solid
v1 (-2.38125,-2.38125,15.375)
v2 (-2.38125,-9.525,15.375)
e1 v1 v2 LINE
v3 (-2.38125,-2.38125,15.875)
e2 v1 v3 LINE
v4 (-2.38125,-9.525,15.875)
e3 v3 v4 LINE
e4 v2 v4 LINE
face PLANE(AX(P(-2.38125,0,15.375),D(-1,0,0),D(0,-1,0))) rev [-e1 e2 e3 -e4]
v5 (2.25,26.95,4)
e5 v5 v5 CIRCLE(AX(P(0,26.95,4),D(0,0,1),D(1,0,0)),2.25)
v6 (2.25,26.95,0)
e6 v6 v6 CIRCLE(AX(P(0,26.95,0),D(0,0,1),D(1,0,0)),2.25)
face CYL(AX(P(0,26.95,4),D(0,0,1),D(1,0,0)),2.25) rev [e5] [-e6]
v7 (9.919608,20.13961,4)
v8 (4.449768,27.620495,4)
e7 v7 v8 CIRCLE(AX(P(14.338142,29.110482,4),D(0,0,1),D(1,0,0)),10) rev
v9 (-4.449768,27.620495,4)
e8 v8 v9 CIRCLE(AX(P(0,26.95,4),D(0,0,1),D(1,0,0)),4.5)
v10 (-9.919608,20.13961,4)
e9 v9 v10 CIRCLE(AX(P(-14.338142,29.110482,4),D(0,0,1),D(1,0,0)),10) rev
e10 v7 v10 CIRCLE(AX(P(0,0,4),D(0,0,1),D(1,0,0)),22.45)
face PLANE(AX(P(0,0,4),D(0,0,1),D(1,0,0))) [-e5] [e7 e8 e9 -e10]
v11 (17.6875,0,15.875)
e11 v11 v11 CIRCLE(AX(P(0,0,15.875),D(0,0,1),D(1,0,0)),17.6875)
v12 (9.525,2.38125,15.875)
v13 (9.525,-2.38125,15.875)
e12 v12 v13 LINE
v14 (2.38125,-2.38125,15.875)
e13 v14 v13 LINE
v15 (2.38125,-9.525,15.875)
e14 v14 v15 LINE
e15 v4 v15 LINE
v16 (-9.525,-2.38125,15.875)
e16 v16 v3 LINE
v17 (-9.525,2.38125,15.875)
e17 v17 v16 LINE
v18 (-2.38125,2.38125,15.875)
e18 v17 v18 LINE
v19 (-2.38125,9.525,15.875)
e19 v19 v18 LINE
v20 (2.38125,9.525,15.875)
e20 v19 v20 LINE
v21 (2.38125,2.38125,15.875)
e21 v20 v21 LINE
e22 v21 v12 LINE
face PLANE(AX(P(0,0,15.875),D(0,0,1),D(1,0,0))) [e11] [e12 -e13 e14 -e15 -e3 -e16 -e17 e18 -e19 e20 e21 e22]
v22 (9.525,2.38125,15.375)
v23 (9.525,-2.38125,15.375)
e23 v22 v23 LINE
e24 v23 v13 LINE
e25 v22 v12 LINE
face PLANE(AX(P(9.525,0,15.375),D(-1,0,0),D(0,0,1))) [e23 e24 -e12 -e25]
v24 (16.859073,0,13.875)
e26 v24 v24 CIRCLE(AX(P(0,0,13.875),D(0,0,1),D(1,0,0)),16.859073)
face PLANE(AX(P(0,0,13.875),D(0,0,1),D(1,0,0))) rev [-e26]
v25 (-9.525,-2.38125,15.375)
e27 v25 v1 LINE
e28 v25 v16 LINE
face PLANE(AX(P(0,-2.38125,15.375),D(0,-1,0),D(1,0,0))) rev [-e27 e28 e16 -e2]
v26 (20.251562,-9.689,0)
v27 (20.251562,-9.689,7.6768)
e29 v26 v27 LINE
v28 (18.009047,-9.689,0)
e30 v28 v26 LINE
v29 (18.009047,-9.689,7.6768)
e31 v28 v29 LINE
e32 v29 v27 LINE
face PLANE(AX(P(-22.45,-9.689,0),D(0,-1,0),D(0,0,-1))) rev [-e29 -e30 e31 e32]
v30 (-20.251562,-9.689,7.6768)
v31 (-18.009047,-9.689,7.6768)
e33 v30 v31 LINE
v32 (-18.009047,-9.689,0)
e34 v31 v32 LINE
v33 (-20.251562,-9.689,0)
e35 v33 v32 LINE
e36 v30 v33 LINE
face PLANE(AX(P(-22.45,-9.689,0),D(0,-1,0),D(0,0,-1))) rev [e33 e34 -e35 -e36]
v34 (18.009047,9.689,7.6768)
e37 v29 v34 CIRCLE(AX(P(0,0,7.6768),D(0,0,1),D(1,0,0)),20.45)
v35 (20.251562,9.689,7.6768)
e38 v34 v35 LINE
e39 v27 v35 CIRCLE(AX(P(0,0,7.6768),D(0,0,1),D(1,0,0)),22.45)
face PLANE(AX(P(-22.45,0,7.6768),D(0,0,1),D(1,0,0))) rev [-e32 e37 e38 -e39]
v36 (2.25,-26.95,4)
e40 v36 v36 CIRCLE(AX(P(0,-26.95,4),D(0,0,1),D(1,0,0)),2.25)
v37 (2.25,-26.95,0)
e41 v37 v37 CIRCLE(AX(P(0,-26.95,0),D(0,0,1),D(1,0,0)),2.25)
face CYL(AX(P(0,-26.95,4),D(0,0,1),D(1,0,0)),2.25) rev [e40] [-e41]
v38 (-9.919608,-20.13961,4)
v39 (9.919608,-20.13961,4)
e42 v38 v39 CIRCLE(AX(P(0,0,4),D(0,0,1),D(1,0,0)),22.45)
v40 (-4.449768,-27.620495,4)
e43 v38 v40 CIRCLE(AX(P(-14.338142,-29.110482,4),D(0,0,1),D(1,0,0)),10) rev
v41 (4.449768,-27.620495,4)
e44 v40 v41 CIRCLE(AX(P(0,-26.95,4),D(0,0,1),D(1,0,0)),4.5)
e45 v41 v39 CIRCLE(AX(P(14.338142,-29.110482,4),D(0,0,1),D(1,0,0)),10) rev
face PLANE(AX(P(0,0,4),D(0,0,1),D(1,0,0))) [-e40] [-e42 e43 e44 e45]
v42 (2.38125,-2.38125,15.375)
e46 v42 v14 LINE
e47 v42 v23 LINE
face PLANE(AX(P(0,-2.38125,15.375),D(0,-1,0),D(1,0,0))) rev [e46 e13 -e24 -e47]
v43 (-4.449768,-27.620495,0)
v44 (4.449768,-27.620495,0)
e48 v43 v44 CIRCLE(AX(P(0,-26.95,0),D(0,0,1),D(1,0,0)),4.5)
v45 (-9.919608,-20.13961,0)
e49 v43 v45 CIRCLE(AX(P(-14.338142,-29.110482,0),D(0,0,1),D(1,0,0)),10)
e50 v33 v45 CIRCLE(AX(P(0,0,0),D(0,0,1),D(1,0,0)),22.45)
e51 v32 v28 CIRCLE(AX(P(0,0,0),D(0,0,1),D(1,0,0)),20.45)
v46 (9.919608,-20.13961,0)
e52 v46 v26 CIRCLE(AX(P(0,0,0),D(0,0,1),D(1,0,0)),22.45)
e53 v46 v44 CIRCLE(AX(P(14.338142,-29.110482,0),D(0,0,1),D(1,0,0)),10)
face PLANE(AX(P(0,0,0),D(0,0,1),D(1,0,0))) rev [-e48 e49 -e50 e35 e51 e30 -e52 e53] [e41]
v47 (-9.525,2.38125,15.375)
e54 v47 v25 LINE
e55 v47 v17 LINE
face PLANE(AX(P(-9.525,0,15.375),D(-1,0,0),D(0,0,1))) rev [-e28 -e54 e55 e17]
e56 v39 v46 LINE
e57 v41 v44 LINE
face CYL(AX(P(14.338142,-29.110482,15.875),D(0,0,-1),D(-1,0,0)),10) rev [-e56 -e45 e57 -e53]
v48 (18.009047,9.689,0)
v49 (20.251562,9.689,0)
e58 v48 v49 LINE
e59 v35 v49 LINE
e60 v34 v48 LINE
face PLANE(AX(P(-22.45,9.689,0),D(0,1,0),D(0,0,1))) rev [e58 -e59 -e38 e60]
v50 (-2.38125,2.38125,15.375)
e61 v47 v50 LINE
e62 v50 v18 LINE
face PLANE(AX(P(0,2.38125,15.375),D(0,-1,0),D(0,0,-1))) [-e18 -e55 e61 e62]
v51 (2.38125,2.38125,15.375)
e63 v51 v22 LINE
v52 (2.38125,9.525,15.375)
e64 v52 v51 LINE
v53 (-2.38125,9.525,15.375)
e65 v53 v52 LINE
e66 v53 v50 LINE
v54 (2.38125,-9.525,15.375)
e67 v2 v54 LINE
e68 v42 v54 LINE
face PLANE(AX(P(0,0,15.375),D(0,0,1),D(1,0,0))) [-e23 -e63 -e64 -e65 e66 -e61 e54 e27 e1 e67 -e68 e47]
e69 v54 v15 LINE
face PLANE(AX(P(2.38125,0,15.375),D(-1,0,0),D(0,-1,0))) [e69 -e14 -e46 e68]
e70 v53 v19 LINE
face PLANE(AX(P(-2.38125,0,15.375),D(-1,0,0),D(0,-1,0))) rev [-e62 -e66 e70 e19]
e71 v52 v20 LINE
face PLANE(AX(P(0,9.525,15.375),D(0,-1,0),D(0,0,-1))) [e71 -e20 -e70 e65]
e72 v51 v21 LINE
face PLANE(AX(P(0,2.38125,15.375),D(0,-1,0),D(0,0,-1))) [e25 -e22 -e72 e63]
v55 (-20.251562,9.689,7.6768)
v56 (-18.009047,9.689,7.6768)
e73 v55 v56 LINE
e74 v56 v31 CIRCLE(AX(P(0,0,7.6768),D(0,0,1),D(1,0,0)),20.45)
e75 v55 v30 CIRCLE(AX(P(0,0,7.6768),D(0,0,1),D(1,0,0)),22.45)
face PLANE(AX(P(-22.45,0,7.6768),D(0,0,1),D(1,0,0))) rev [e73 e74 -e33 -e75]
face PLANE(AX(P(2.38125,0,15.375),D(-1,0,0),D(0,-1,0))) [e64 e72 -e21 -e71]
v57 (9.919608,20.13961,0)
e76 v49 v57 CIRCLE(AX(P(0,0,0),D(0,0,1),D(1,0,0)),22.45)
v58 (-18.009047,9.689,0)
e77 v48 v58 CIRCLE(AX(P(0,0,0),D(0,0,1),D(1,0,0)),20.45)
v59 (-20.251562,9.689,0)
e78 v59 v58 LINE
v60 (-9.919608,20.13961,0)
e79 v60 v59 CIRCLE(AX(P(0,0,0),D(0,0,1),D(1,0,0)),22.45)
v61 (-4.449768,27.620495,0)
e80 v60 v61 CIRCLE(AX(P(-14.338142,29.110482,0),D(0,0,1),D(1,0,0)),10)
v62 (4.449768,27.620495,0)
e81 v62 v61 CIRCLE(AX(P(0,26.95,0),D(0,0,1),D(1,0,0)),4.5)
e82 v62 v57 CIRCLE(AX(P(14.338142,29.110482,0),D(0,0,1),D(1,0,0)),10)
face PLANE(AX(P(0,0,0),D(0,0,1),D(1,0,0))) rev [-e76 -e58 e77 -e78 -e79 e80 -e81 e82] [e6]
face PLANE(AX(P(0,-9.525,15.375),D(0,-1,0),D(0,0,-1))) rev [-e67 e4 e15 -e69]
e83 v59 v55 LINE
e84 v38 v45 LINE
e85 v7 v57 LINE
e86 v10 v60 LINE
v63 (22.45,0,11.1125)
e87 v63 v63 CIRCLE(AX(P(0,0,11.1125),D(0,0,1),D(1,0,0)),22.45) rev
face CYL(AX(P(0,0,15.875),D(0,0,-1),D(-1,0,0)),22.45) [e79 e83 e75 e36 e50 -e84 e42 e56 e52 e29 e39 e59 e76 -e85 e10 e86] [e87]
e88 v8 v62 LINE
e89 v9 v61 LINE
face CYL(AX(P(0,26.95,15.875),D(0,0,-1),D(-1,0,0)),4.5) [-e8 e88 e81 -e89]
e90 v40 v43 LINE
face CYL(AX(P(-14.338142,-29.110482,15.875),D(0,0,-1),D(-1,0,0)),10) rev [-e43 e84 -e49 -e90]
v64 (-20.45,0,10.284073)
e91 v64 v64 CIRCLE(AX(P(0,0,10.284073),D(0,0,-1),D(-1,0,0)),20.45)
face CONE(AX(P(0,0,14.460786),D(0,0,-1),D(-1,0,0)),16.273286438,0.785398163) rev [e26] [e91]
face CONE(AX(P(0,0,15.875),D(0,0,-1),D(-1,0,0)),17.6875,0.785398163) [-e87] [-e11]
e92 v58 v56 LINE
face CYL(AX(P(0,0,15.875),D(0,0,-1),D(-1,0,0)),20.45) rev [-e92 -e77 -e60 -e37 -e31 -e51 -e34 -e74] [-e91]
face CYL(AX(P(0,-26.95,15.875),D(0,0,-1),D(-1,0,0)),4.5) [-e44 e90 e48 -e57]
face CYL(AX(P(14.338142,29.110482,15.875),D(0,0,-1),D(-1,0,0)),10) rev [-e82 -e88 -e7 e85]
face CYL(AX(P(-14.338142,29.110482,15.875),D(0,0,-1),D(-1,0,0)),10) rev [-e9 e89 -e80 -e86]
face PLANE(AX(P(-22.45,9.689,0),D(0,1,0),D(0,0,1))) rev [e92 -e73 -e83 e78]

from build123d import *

# Parameters (mm, degrees)
SKETCH1_R               = 20.450000000000003
BOSS_EXTRUDE1_DEPTH     = 15.875
CUT_EXTRUDE2_START      = -11.875
CUT_EXTRUDE2_DEPTH      = 11.875
M4_CLEARANCE_HOLE1_D    = 4.5
CHAMFER1_SIZE           = 4.7625
SHELL1_OUTLINE_R        = 20.45
SHELL1_DEPTH            = 10.284072775
SHELL1_2_DEPTH          = 2
BOSS_EXTRUDE2_START     = 2
BOSS_EXTRUDE2_DEPTH     = 2
CUT_EXTRUDE5_DEPTH      = 0.5
CUT_EXTRUDE7_DEPTH      = 42.774640932046694
CUT_EXTRUDE7_DEPTH_BACK = 42.774640932046694


with BuildPart() as part:
    # Sketch1 → Boss-Extrude1 (new body)
    # profile 1 of 2: a face of its own
    with BuildSketch(Plane.XY):
        with BuildLine():
            ThreePointArc((-4.449768205772106, -27.620494530122933), (-6.26579346059064, -23.208178662106004), (-9.919608253272203, -20.139609532026952))
            ThreePointArc((-9.919608253272203, -20.139609532026952), (-22.449999999999612, -2.260939e-11), (-9.919608253272486, 20.139609531981904))
            ThreePointArc((-9.919608253272486, 20.139609531981904), (-6.265793460590954, 23.208178662061), (-4.449768205772483, 27.620494530077963))
            ThreePointArc((-4.449768205772483, 27.620494530077963), (1.6339e-13, 31.449999999977553), (4.449768205772869, 27.620494530078034))
            ThreePointArc((4.449768205772869, 27.620494530078034), (6.265793460591407, 23.2081786620611), (9.919608253272981, 20.139609531982046))
            ThreePointArc((9.919608253272981, 20.139609531982046), (22.4500000000004, -2.229809e-11), (9.919608253273257, -20.13960953202682))
            ThreePointArc((9.919608253273257, -20.13960953202682), (6.265793460591725, -23.20817866210592), (4.449768205773249, -27.620494530122876))
            ThreePointArc((4.449768205773249, -27.620494530122876), (5.9636e-13, -31.450000000022463), (-4.449768205772106, -27.620494530122933))
        make_face()
        Circle(SKETCH1_R, mode=Mode.SUBTRACT)
    # profile 2 of 2: a face of its own
    with BuildSketch(Plane.XY):
        Circle(SKETCH1_R)
    extrude(amount=BOSS_EXTRUDE1_DEPTH)

    # Sketch3 → Cut-Extrude2 (cut)
    with BuildSketch(Plane.XY.offset(15.875).offset(CUT_EXTRUDE2_START)):
        with BuildLine():
            ThreePointArc((-9.919608253272486, 20.139609531981908), (2.3162e-13, 22.449999999977553), (9.919608253272981, 20.13960953198205))
            ThreePointArc((9.91960825327298, 20.139609531982046), (6.2657934605914, 23.208178662061094), (4.4497682057728625, 27.620494530078037))
            ThreePointArc((4.4497682057728625, 27.620494530078037), (1.6065e-13, 31.449999999977546), (-4.449768205772477, 27.620494530077963))
            ThreePointArc((-4.449768205772479, 27.620494530077963), (-6.265793460590951, 23.208178662061), (-9.919608253272482, 20.139609531981904))
        make_face()
        with BuildLine():
            ThreePointArc((4.449768205773246, -27.62049453012288), (6.265793460591725, -23.20817866210592), (9.919608253273257, -20.13960953202682))
            ThreePointArc((9.919608253273244, -20.139609532026824), (5.4515e-13, -22.45000000002246), (-9.919608253272205, -20.139609532026956))
            ThreePointArc((-9.9196082532722, -20.139609532026952), (-6.265793460590633, -23.208178662106), (-4.449768205772095, -27.620494530122933))
            ThreePointArc((-4.4497682057720995, -27.620494530122933), (5.9608e-13, -31.450000000022456), (4.449768205773246, -27.62049453012288))
        make_face()
    extrude(amount=CUT_EXTRUDE2_DEPTH, mode=Mode.SUBTRACT)

    # M4 Clearance Hole1 (through all)
    with Locations(Plane.XY.offset(4)):
        with Locations((0, -26.95), (0, 26.95)):
            Hole(M4_CLEARANCE_HOLE1_D / 2)

    # Chamfer1
    chamfer1_edges = [part.edges().sort_by_distance(p)[0] for p in [
        (9.91960825327299, 20.139609531982046, 15.875),
    ]]
    chamfer(chamfer1_edges, length=CHAMFER1_SIZE)

    # Shell1: read off the stored shape, not the designer's step
    # Shell1 outline → Shell1 (cut)
    with BuildSketch(Plane.XY):
        Circle(SHELL1_OUTLINE_R)
    extrude(amount=SHELL1_DEPTH, mode=Mode.SUBTRACT)

    # Shell1 2 outline → Shell1 2 (cut)
    with BuildSketch(Plane.XY):
        with BuildLine():
            ThreePointArc((9.035901505, -18.345434963), (0, -20.45), (-9.035901505, -18.345434963))
            ThreePointArc((-9.035901505, -18.345434963), (-5.656595992, -20.826114024), (-3.336769132, -24.317800965))
            ThreePointArc((-3.336769132, -24.317800965), (0, -22.7), (3.336769132, -24.317800965))
            ThreePointArc((3.336769132, -24.317800965), (5.656595992, -20.826114024), (9.035901505, -18.345434963))
        make_face()
        with BuildLine():
            ThreePointArc((-3.336769132, 24.317800965), (-5.656595992, 20.826114024), (-9.035901505, 18.345434963))
            ThreePointArc((-9.035901505, 18.345434963), (0, 20.45), (9.035901505, 18.345434963))
            ThreePointArc((9.035901505, 18.345434963), (5.656595992, 20.826114024), (3.336769132, 24.317800965))
            ThreePointArc((3.336769132, 24.317800965), (0, 22.7), (-3.336769132, 24.317800965))
        make_face()
    extrude(amount=SHELL1_2_DEPTH, mode=Mode.SUBTRACT)

    # Shell1 3 outline → Shell1 3 (revolve, cut)
    with BuildSketch(Plane.XZ):
        Polygon((16.859072875, 13.875), (0, 13.875), (0, 10.284072775), (20.45, 10.284072775), align=None)
    revolve(axis=Axis((0, 0, 0), (0, 0, 1)), mode=Mode.SUBTRACT)

    # Sketch6 → Boss-Extrude2 (add)
    with BuildSketch(Plane(origin=(0, 0, 2), x_dir=(-1, 0, 0), z_dir=(0, 0, -1)).offset(BOSS_EXTRUDE2_START)):
        with BuildLine():
            ThreePointArc((9.035901504651038, -18.34543496347422), (5.656595991725949, -20.826114024149227), (3.3367691319005477, -24.3178009648972))
            ThreePointArc((3.3367691319005477, -24.3178009648972), (-5.6684e-13, -22.70000000000008), (-3.3367691319011485, -24.317800964898304))
            ThreePointArc((-3.3367691319011485, -24.317800964898304), (-5.656595991726578, -20.826114024149597), (-9.035901504652076, -18.345434963474087))
            ThreePointArc((-9.035901504652076, -18.345434963474087), (-5.3382e-13, -20.45000000002246), (9.035901504651038, -18.34543496347422))
        make_face()
        with BuildLine():
            ThreePointArc((-9.035901504651829, 18.345434963429298), (-5.65659599172108, 20.826114024110222), (-3.336769131894781, 24.31780096486728))
            ThreePointArc((-3.336769131894781, 24.31780096486728), (-2.2525e-13, 22.699999999977557), (3.336769131894348, 24.317800964867242))
            ThreePointArc((3.336769131894348, 24.317800964867242), (5.656595991720593, 20.826114024110154), (9.03590150465129, 18.345434963429177))
            ThreePointArc((9.03590150465129, 18.345434963429177), (-2.5229e-13, 20.449999999977546), (-9.035901504651829, 18.345434963429298))
        make_face()
    extrude(amount=-BOSS_EXTRUDE2_DEPTH)

    # Sketch7 → Cut-Extrude5 (cut)
    with BuildSketch(Plane.XY.offset(15.875)):
        Polygon((-2.381250000000002, 9.524999999999997), (-2.381250000000001, 2.3812500000000005), (2.3812499999999996, 2.3812500000000005), (2.3812499999999983, 9.524999999999997), align=None)
        Polygon((2.3812499999999996, 2.3812500000000005), (-2.3812500000000014, 2.3812500000000005), (-2.3812500000000005, -2.3812499999999996), (2.3812499999999996, -2.3812499999999996), align=None)
        Polygon((9.525, 2.3812500000000005), (2.3812499999999996, 2.3812500000000005), (2.381249999999999, -2.3812499999999996), (9.525, -2.3812499999999996), align=None)
        Polygon((-2.3812500000000014, 2.3812500000000005), (-9.525, 2.3812500000000005), (-9.525, -2.3812500000000005), (-2.3812500000000005, -2.38125), align=None)
        Polygon((2.3812499999999996, -2.3812499999999996), (-2.3812500000000005, -2.38125), (-2.3812499999999996, -9.525000000000004), (2.3812499999999996, -9.525000000000004), align=None)
    extrude(amount=-CUT_EXTRUDE5_DEPTH, mode=Mode.SUBTRACT)

    # Sketch9 → Cut-Extrude7 (cut, two sides: drawn at the far end of the back side and taken through both)
    # profile 1 of 3: a face of its own
    with BuildSketch(Plane(origin=(0, 0, 0), x_dir=(0, 0, -1), z_dir=(1, 0, 0)).offset(-CUT_EXTRUDE7_DEPTH_BACK)):
        Polygon((-1.5018000000013485, 9.688999997177131), (-1.5018000000013485, -9.68900000282286), (-7.676800000001349, -9.689000002822862), (-7.676800000001349, 9.688999997177131), align=None)
        Polygon((-3.0018000000013485, 8.188999997177131), (-6.176800000001349, 8.188999997177124), (-6.176800000001349, -8.189000002822862), (-3.0018000000013485, -8.189000002822862), align=None, mode=Mode.SUBTRACT)
    # profile 2 of 3: a face of its own
    with BuildSketch(Plane(origin=(0, 0, 0), x_dir=(0, 0, -1), z_dir=(1, 0, 0)).offset(-CUT_EXTRUDE7_DEPTH_BACK)):
        Polygon((0, -9.68900000282286), (-1.5018000000013485, -9.68900000282286), (-1.5018000000013485, 9.688999997177131), (0, 9.68899999717713), align=None)
    # profile 3 of 3: a face of its own
    with BuildSketch(Plane(origin=(0, 0, 0), x_dir=(0, 0, -1), z_dir=(1, 0, 0)).offset(-CUT_EXTRUDE7_DEPTH_BACK)):
        Polygon((-3.0018000000013485, 8.188999997177131), (-3.0018000000013485, -8.189000002822862), (-6.176800000001349, -8.189000002822862), (-6.176800000001349, 8.188999997177124), align=None)
    extrude(amount=CUT_EXTRUDE7_DEPTH + CUT_EXTRUDE7_DEPTH_BACK, mode=Mode.SUBTRACT)


solid = part.part
